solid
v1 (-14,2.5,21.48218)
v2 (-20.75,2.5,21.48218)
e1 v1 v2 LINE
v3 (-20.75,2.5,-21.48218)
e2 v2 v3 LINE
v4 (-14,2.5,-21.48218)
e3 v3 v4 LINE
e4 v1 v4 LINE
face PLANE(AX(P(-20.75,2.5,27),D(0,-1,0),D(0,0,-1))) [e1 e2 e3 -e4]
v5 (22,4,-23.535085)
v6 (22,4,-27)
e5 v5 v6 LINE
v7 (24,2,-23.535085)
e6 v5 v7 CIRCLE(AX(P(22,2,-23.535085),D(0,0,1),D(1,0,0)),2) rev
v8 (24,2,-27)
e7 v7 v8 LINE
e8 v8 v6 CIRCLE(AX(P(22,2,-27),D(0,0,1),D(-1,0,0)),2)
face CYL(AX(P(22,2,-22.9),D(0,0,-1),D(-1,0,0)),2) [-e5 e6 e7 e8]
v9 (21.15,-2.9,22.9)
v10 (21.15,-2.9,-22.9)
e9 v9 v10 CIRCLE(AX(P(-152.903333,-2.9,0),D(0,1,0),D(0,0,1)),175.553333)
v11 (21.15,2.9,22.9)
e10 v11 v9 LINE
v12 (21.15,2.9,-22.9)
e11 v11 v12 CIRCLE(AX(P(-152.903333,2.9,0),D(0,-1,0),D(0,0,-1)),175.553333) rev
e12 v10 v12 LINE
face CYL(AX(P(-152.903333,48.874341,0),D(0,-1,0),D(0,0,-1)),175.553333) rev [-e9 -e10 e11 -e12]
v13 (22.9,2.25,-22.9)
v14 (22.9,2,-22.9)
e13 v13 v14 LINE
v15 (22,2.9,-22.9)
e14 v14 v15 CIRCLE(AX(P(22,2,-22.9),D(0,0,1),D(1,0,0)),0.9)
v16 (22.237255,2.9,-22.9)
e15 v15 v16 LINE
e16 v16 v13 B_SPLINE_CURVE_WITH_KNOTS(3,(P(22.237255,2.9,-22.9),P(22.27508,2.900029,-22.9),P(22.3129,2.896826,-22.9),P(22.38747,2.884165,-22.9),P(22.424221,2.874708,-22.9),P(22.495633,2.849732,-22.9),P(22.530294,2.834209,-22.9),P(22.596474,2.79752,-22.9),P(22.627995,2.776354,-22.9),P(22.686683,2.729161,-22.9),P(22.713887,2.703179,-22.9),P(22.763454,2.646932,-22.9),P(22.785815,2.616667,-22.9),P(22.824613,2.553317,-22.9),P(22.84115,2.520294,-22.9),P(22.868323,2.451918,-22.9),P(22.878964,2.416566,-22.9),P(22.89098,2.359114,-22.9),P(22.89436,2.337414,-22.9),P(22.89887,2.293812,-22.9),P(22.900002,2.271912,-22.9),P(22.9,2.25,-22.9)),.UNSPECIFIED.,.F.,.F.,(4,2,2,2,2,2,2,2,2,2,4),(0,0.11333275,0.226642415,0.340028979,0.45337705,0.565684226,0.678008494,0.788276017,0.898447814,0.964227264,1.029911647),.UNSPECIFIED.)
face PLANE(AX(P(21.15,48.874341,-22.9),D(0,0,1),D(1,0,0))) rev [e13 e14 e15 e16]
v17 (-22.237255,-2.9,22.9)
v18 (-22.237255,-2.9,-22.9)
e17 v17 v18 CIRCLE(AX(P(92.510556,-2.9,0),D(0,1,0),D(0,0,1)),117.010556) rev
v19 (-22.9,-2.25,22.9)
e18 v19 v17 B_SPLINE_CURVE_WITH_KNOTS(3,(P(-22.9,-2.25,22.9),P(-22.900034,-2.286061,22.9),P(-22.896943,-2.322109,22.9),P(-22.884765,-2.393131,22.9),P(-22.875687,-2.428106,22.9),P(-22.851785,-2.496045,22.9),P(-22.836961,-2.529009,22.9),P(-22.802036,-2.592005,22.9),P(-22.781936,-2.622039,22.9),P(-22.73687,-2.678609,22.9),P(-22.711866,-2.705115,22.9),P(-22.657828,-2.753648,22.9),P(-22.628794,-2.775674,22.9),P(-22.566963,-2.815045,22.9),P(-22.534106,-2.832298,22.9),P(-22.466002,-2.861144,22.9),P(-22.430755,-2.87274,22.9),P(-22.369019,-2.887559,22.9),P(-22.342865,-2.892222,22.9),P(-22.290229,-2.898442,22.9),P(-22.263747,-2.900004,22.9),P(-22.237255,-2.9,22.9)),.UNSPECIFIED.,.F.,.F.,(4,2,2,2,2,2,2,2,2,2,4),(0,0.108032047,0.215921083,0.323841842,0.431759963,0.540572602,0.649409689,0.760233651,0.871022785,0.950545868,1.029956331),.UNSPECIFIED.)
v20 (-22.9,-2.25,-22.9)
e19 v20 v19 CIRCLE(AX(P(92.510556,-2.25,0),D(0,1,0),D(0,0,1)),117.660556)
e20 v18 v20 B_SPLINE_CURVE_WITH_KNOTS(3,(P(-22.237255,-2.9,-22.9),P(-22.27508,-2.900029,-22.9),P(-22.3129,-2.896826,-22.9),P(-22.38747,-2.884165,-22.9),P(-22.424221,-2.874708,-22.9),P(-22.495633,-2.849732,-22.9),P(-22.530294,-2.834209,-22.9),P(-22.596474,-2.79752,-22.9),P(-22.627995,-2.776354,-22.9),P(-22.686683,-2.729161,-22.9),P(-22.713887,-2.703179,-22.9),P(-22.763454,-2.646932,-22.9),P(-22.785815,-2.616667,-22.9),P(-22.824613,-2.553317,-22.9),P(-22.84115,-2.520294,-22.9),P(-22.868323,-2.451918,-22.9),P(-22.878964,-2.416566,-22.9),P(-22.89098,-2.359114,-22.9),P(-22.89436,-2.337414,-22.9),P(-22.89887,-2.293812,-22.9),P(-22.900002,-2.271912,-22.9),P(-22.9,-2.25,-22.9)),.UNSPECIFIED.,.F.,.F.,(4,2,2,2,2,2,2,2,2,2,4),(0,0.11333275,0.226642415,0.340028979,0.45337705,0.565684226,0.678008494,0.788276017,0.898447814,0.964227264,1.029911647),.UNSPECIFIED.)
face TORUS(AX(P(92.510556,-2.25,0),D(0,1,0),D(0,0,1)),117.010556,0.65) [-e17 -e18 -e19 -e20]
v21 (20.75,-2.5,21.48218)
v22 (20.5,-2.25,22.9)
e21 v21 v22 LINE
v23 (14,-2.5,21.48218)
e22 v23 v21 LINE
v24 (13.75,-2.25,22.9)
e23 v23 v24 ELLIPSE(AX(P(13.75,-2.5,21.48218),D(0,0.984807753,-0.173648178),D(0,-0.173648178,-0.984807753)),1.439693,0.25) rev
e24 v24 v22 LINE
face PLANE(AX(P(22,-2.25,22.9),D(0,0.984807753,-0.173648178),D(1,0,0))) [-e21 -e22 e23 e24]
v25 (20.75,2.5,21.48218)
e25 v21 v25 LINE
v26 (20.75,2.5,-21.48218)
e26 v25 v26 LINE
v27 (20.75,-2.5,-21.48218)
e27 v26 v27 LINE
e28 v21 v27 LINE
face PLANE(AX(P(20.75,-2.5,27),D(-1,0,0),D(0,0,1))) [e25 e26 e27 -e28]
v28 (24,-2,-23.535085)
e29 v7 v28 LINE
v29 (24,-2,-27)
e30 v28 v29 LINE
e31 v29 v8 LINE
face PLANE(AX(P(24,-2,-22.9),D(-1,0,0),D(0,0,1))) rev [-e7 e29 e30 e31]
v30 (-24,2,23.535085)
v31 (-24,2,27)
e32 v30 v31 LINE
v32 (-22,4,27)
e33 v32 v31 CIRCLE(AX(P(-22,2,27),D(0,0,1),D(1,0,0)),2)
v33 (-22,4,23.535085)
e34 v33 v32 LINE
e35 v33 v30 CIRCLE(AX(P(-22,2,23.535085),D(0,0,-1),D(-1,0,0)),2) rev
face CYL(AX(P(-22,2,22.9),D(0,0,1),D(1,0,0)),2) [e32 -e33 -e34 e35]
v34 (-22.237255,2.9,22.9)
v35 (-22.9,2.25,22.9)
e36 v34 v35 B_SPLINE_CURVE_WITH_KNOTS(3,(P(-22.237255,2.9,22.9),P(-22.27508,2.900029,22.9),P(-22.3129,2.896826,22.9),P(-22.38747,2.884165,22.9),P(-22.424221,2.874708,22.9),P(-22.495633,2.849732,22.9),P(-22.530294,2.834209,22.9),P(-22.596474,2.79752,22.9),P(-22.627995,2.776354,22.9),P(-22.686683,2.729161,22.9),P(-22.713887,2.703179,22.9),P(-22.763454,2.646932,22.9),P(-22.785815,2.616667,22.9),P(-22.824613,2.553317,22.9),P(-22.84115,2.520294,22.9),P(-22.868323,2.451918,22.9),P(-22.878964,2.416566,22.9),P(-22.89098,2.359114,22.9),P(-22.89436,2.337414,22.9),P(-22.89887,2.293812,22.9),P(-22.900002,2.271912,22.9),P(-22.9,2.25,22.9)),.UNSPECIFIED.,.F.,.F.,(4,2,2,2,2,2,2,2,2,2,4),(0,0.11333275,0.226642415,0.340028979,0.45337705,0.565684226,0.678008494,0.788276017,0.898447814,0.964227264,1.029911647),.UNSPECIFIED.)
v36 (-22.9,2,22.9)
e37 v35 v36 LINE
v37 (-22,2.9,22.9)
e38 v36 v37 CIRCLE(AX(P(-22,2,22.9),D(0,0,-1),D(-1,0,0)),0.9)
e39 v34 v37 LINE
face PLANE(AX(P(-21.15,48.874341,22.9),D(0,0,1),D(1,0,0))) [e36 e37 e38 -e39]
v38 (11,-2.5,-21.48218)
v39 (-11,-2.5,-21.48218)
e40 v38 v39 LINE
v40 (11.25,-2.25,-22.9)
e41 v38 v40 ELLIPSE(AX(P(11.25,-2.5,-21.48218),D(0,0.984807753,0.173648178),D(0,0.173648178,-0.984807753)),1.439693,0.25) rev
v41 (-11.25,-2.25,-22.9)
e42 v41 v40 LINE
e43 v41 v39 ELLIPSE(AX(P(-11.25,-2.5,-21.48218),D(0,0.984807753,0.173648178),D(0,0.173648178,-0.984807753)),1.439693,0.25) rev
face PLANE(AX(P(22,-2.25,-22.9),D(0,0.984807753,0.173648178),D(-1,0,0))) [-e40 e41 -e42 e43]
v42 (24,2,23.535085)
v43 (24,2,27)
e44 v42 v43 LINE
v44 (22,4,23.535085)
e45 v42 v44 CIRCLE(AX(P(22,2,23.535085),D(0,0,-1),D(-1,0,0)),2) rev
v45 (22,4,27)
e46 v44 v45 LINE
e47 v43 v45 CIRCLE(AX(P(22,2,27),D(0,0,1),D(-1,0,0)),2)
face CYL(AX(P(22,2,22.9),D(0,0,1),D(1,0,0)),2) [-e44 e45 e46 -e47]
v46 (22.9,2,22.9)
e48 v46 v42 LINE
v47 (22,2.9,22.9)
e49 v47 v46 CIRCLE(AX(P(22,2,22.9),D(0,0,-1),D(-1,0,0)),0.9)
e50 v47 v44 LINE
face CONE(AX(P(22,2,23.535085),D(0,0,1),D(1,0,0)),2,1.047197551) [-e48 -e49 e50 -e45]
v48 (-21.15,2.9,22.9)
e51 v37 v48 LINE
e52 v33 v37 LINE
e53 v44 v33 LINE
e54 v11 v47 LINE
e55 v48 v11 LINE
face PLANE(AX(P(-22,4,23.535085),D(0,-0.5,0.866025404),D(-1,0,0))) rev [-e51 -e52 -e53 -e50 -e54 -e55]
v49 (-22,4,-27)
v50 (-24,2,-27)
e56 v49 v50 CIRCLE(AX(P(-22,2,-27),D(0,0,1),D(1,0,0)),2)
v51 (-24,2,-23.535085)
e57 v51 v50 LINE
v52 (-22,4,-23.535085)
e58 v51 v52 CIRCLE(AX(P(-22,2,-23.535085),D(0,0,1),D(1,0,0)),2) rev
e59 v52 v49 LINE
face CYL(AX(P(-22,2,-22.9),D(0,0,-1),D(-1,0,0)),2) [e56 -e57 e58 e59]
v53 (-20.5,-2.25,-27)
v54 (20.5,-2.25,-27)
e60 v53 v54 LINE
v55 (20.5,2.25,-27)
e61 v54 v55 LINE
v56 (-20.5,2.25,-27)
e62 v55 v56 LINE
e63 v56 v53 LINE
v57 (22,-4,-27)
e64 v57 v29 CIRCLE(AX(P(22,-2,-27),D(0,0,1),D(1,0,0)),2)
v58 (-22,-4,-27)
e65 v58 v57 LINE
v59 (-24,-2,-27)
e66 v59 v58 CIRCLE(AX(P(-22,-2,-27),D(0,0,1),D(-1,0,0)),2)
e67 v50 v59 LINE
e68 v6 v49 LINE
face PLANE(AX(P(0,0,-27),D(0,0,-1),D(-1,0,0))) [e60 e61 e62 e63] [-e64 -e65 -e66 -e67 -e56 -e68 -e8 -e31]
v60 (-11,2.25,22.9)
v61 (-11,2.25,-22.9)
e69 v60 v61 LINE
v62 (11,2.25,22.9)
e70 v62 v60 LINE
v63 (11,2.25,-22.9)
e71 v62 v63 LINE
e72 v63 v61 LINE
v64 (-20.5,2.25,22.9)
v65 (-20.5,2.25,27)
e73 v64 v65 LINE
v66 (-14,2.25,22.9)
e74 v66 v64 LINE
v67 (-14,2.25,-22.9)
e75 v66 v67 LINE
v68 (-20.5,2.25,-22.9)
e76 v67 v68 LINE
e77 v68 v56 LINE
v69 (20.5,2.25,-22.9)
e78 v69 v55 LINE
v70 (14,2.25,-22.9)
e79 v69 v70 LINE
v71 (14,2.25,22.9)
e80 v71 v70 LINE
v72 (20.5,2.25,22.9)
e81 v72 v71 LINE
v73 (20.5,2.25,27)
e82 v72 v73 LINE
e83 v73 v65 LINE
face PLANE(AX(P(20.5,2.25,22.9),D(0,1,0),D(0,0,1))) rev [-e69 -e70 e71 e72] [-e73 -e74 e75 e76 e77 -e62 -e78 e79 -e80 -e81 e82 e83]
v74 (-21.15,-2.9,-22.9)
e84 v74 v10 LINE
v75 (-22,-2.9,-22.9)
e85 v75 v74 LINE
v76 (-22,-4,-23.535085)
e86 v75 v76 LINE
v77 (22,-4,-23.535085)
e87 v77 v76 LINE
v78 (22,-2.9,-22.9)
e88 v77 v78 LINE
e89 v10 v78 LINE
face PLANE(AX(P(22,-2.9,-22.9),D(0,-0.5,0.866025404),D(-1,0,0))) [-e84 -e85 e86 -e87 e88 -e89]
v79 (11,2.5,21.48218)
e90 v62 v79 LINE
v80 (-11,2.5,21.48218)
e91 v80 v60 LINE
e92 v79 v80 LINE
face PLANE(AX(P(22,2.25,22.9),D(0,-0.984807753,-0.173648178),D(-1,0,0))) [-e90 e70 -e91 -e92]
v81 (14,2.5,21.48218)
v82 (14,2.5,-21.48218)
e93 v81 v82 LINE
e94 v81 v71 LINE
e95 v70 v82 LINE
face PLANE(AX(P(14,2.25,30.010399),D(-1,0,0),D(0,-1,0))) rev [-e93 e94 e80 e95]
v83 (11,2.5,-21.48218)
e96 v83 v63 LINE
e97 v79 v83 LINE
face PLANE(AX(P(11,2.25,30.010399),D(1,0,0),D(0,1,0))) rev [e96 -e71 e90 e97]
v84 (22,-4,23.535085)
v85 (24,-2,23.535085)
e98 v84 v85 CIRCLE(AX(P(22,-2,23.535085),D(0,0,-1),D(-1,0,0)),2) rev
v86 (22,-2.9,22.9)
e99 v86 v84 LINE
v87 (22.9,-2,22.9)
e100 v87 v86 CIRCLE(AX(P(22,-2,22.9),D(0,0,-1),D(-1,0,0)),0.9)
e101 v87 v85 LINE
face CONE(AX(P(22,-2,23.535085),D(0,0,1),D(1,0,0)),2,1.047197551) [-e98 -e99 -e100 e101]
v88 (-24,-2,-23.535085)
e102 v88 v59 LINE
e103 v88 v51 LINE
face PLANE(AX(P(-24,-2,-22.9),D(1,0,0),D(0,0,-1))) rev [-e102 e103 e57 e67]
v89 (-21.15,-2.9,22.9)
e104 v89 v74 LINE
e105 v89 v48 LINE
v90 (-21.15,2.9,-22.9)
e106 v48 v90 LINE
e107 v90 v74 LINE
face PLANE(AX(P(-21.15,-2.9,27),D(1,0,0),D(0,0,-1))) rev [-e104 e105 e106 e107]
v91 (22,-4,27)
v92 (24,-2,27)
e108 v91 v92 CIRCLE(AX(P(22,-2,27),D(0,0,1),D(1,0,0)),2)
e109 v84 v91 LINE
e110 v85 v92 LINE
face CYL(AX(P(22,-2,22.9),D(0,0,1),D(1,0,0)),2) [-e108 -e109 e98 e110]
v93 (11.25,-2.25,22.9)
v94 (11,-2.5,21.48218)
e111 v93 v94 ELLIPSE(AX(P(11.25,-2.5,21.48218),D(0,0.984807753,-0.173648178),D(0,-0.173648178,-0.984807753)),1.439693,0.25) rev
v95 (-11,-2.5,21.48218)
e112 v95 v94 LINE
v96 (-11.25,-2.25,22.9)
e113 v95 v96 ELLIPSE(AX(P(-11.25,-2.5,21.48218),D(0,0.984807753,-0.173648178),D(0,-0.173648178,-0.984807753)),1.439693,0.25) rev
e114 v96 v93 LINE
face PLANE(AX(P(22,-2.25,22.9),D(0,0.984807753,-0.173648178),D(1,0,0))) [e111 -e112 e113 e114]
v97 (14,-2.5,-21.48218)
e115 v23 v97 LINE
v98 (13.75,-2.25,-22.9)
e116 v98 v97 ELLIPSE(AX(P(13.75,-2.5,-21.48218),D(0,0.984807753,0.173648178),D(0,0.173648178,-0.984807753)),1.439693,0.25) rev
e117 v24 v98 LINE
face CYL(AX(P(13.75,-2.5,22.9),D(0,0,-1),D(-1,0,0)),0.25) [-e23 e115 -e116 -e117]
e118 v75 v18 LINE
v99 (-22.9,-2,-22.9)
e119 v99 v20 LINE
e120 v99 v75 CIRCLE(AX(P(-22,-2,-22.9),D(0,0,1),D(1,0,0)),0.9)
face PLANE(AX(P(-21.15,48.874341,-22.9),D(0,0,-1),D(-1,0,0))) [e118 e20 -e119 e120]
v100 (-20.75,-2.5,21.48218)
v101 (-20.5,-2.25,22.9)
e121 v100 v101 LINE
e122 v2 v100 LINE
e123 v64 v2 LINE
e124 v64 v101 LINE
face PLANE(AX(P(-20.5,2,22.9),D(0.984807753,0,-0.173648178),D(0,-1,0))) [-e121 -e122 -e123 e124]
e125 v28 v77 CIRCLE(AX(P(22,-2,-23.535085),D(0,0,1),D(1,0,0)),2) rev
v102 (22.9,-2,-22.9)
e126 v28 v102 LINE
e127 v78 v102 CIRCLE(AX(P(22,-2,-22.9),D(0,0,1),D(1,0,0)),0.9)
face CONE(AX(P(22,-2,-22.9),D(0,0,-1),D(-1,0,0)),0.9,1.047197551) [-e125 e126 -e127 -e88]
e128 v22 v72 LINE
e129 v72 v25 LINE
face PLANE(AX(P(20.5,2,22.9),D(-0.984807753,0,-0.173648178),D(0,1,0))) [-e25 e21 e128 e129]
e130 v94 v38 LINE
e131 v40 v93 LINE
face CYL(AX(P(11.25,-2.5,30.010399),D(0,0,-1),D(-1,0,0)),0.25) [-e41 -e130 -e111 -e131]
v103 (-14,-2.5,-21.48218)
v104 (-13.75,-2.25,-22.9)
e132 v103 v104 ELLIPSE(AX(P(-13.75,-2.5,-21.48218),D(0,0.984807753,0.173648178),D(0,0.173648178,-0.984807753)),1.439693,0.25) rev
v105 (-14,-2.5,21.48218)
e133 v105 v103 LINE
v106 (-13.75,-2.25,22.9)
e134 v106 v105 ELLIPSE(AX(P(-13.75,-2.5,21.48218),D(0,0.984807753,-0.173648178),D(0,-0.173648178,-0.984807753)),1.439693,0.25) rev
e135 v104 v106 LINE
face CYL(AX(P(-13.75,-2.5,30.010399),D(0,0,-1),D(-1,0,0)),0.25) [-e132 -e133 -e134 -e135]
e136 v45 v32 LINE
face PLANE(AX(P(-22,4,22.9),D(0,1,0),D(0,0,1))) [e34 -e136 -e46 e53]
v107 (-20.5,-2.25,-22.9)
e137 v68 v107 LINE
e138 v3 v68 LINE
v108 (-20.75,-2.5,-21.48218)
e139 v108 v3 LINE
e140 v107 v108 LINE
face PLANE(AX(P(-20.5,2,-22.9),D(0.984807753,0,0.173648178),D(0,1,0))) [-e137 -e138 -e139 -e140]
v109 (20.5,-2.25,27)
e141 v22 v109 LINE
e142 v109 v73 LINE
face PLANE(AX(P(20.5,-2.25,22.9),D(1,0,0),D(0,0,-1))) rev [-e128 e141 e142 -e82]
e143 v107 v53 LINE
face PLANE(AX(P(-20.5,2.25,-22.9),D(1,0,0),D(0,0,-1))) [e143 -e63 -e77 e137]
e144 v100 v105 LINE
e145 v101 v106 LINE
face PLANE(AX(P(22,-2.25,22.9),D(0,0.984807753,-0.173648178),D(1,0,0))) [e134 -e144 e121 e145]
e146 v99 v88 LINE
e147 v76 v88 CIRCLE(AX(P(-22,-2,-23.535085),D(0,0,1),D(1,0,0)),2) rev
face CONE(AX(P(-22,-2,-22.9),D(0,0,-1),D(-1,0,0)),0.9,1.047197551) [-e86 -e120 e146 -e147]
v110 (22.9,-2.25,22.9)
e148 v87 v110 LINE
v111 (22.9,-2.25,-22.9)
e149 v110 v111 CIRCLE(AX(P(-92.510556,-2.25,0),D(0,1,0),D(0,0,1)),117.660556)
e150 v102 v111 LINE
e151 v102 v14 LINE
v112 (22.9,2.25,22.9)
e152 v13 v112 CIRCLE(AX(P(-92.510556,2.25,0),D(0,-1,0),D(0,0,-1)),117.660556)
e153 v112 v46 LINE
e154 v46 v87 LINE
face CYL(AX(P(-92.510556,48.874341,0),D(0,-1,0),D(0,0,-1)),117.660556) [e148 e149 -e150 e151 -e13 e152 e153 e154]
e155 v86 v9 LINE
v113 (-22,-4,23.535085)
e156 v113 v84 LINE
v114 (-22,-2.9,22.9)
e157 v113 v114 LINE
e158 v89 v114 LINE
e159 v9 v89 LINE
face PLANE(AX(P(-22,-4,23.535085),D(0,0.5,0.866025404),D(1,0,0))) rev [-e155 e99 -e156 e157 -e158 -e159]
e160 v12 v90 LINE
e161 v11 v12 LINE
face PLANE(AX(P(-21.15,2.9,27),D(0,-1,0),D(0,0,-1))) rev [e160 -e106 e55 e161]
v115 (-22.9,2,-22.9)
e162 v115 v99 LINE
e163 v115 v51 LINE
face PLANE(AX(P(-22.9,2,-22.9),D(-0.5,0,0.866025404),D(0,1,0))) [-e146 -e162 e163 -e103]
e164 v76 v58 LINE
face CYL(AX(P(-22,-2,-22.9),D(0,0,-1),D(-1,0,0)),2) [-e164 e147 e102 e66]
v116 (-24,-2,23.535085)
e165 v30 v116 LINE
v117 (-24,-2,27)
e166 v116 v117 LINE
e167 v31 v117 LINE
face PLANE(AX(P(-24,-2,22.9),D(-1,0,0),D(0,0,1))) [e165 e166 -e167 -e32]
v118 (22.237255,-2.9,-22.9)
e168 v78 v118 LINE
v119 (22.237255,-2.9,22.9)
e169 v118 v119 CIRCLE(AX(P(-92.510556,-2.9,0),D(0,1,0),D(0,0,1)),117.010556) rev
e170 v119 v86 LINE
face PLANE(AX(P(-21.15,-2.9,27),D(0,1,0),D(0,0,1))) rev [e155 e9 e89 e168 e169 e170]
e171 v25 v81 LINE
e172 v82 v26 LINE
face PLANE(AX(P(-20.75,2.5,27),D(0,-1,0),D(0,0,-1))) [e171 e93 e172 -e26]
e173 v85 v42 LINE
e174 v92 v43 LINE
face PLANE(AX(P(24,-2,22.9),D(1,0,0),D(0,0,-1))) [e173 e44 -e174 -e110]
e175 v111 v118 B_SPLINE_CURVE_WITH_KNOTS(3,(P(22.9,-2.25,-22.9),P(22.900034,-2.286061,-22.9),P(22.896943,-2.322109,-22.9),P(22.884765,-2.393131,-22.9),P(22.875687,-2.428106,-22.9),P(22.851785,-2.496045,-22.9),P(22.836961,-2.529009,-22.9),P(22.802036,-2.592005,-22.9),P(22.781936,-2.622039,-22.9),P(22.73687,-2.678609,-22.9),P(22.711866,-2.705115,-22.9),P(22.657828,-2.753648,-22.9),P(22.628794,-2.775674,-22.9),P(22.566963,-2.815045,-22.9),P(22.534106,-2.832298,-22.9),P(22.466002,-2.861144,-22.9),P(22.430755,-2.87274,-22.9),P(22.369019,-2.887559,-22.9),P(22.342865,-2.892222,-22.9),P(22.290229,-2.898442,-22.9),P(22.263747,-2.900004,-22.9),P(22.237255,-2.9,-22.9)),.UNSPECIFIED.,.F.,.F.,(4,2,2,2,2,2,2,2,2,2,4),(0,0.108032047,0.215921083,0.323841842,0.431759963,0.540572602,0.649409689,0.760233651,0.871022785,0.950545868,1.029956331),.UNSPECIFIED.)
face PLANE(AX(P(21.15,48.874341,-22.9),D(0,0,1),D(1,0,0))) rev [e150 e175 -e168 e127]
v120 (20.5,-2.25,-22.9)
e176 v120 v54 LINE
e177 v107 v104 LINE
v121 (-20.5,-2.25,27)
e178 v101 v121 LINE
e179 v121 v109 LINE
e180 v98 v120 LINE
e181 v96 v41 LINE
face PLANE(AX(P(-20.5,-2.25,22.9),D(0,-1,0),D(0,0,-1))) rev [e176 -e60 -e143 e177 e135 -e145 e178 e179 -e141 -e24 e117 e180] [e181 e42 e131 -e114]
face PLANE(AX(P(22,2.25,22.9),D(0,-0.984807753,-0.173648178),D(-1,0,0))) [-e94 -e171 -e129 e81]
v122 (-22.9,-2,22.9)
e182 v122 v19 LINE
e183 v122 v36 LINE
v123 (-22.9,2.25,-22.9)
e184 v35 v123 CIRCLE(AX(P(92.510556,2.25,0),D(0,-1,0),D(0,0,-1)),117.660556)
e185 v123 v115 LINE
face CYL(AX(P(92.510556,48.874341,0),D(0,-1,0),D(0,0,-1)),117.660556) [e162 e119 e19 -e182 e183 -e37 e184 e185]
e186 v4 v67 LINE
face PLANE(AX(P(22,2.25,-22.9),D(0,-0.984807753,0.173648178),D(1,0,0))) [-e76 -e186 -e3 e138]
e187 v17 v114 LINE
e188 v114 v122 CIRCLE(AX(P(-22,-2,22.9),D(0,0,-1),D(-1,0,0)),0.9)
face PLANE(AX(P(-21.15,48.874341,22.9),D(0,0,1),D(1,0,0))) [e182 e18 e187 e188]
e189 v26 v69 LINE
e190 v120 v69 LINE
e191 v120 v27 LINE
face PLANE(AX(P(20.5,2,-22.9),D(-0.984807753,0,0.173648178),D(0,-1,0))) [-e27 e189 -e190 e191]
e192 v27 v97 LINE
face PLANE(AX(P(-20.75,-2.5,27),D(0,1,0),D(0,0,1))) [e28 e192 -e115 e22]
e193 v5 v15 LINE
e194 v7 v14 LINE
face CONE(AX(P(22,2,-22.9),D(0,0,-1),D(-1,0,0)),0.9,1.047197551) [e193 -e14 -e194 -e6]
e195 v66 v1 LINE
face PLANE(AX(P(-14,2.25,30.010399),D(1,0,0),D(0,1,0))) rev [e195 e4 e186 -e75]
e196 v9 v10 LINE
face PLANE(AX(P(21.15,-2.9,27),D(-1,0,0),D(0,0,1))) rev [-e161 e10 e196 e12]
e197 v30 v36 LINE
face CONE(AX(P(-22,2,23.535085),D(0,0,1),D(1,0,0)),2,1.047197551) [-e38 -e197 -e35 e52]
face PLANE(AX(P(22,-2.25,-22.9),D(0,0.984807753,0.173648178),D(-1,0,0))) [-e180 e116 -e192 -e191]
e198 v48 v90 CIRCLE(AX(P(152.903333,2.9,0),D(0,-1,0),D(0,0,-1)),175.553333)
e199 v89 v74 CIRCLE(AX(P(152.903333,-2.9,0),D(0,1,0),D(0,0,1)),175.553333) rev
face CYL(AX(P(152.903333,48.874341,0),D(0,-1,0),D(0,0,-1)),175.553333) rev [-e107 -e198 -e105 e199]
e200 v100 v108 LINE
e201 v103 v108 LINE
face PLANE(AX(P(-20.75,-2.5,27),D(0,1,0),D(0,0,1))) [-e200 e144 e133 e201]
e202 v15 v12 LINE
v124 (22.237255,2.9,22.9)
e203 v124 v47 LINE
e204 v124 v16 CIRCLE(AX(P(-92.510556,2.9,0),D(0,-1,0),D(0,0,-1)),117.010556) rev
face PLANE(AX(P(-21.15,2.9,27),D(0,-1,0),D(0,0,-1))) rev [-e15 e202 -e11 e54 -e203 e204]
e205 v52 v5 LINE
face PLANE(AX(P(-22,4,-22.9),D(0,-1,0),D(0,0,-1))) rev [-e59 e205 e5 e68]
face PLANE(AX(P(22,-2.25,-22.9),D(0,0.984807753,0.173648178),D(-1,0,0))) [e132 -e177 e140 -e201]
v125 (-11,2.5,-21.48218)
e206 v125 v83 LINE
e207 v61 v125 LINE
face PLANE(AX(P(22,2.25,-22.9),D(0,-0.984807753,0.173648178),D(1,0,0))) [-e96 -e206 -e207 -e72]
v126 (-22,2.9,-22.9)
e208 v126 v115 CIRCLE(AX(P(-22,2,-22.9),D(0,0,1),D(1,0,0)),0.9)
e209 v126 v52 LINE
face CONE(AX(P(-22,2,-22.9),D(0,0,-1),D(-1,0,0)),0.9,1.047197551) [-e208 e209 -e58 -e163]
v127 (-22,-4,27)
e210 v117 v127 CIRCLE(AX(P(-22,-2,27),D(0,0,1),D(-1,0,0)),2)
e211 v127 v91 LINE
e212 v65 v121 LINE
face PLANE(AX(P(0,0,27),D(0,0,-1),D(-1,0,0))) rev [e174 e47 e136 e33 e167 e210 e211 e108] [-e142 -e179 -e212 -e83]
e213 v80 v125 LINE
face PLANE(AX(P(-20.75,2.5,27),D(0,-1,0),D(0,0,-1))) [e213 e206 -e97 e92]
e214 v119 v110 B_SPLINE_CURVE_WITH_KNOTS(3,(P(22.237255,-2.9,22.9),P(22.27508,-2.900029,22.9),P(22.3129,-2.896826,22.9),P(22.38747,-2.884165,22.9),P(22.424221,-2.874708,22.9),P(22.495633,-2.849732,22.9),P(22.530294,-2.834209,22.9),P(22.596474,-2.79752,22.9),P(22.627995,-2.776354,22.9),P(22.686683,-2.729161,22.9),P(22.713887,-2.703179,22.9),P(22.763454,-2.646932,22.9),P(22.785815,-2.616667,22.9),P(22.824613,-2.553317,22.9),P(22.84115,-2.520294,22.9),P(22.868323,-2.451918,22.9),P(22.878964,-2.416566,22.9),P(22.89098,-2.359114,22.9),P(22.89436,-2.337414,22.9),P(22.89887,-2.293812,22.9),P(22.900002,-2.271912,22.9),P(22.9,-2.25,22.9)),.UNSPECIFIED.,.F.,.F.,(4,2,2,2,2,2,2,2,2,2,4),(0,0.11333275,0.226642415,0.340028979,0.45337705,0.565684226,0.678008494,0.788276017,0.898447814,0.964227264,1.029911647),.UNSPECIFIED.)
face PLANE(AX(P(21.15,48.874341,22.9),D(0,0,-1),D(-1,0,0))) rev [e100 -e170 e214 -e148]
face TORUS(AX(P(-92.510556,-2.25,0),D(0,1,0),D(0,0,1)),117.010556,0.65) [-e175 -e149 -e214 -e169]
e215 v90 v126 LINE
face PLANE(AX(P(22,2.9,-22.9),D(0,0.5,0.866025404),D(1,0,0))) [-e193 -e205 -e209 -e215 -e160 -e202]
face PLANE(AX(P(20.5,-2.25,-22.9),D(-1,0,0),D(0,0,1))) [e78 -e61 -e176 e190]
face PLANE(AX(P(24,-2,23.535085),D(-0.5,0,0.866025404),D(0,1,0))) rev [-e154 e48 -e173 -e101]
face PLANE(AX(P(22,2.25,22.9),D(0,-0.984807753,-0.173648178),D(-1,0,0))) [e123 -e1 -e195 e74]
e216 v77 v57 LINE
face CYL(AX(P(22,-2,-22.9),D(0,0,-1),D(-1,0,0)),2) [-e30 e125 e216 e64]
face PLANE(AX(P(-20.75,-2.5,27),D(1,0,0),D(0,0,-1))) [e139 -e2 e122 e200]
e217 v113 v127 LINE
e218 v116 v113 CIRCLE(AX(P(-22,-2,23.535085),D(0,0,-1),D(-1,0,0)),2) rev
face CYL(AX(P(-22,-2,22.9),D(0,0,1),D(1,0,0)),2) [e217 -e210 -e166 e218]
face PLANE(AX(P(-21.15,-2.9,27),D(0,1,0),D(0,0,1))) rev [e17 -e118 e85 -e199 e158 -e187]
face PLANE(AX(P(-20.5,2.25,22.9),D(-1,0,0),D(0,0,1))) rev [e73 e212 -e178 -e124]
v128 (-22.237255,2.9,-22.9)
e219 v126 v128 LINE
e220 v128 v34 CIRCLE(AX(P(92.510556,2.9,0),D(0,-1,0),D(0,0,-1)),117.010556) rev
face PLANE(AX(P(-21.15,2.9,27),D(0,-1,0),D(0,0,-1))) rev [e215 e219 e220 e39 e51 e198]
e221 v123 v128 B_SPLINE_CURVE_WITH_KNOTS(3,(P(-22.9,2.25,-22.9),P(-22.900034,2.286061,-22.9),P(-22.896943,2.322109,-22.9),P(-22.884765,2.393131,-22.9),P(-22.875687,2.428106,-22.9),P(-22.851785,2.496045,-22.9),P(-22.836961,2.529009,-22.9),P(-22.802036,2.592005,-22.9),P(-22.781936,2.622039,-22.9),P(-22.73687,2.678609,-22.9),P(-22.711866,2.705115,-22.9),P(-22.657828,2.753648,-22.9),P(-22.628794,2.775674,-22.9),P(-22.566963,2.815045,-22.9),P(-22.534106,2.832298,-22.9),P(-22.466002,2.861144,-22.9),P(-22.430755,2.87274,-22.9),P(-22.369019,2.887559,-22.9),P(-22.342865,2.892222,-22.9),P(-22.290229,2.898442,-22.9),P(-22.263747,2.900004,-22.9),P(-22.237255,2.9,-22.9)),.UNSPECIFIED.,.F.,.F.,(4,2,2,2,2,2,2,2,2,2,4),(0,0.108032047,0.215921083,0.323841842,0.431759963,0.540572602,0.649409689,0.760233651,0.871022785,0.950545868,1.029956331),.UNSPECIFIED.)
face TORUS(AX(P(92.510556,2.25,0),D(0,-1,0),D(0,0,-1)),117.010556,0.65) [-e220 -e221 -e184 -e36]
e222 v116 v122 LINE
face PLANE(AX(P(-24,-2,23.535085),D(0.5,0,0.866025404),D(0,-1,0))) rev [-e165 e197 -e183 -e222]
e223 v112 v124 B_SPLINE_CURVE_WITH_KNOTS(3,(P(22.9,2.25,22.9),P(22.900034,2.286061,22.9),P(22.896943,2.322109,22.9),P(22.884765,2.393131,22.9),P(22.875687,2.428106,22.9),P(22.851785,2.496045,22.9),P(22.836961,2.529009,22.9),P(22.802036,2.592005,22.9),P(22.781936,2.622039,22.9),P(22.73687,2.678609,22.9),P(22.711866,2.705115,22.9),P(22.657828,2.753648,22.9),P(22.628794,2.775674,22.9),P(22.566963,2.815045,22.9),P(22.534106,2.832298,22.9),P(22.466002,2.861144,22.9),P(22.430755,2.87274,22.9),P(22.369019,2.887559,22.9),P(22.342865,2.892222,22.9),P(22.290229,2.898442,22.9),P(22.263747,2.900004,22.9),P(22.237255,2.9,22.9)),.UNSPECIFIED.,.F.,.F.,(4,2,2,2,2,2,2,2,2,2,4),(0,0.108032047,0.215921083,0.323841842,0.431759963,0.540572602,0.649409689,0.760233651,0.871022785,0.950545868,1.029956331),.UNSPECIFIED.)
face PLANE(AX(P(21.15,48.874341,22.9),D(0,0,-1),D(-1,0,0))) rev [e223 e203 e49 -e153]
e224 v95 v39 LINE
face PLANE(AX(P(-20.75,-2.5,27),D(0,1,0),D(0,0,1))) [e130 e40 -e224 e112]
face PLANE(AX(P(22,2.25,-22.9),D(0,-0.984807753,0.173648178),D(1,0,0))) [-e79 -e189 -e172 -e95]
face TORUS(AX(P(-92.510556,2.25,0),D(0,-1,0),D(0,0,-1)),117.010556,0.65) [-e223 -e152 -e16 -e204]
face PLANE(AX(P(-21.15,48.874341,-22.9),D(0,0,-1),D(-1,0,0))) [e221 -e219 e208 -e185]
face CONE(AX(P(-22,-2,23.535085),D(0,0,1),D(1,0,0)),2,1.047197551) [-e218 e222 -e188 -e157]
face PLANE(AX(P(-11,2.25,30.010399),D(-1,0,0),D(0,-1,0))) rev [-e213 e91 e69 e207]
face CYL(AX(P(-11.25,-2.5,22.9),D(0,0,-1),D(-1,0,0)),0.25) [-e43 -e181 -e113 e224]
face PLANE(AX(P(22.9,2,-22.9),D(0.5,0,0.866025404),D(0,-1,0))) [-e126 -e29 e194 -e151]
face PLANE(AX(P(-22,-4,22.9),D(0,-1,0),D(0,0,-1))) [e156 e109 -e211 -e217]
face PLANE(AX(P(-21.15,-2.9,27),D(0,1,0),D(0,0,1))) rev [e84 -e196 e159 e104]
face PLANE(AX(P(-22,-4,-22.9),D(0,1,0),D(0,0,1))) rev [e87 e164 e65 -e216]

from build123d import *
from OCP.BRepFilletAPI import BRepFilletAPI_MakeChamfer

# Parameters (mm, degrees)
SKETCH1_W                                  = 42.3
SKETCH1_H                                  = 5.8
SKETCH1_W_2                                = 41.5
SKETCH1_H_2                                = 5
CORE_POCKET_DEPTH                          = 27
SKETCH2_W                                  = 41
SKETCH2_H                                  = 4.5
BOSS_EXTRUDE2_DEPTH                        = 4.1
CHAMFER2_SIZE                              = 1.1
CHAMFER2_SIZE_2                            = 0.635085296
CHAMFER3_SIZE                              = 1.417820455
CHAMFER3_SIZE_2                            = 0.25
SIDE_SUPPORT_DEPTH                         = 2.9
SIDE_SUPPORT_FILLET_R                      = 0.65
SIDE_SUPPORT_FILLET_OF_SIDE_SUPPORT_MIRR_R = 0.65
BOSS_EXTRUDE3_START                        = 4.1
SKETCH5_W                                  = 3
SKETCH5_H                                  = 0.25
BOSS_EXTRUDE3_DEPTH                        = 45.8
FILLET1_R                                  = 0.25


# Read off the part's stored shape, not the designer's step: Mirror1
# Some blends are built 0.0001 mm under size
with BuildPart() as part:
    # Sketch1 → Core-Pocket (new, symmetric)
    with BuildSketch(Plane.XY):
        Rectangle(SKETCH1_W, SKETCH1_H)
        Rectangle(SKETCH1_W_2, SKETCH1_H_2, mode=Mode.SUBTRACT)
    extrude(amount=CORE_POCKET_DEPTH, both=True)

    # Sketch2 → Boss-Extrude2 (add)
    with BuildSketch(Plane.XY.offset(27)):
        with BuildLine():
            Line((-22, -4), (22, -4))
            ThreePointArc((22, -4), (23.414213562, -3.414213562), (24, -2))
            Line((24, -2), (24, 2))
            ThreePointArc((24, 2), (23.414213562, 3.414213562), (22, 4))
            Line((22, 4), (-22, 4))
            ThreePointArc((-22, 4), (-23.414213562, 3.414213562), (-24, 2))
            Line((-24, 2), (-24, -2))
            ThreePointArc((-24, -2), (-23.414213562, -3.414213562), (-22, -4))
        make_face()
        Rectangle(SKETCH2_W, SKETCH2_H, mode=Mode.SUBTRACT)
    extrude(amount=-BOSS_EXTRUDE2_DEPTH)

    # Chamfer2
    chamfer2_edges_1 = [part.edges().sort_by_distance(p)[0] for p in [
        (23.414213562, 3.414213562, 22.9),
    ]]
    chamfer2_side_1 = [part.faces().sort_by_distance(p)[0] for p in [
        (23.4052321, 3.4052321, 22.9),
    ]]
    chamfer2_edges_2 = [part.edges().sort_by_distance(p)[0] for p in [
        (24, 0, 22.9),
    ]]
    chamfer2_side_2 = [part.faces().sort_by_distance(p)[0] for p in [
        (23.987298294, 0, 22.9),
    ]]
    chamfer2_edges_3 = [part.edges().sort_by_distance(p)[0] for p in [
        (23.414213562, -3.414213562, 22.9),
    ]]
    chamfer2_side_3 = [part.faces().sort_by_distance(p)[0] for p in [
        (23.4052321, -3.4052321, 22.9),
    ]]
    chamfer2_edges_4 = [part.edges().sort_by_distance(p)[0] for p in [
        (0, -4, 22.9),
    ]]
    chamfer2_side_4 = [part.faces().sort_by_distance(p)[0] for p in [
        (0, -3.987298294, 22.9),
    ]]
    chamfer2_edges_5 = [part.edges().sort_by_distance(p)[0] for p in [
        (-23.414213562, -3.414213562, 22.9),
    ]]
    chamfer2_side_5 = [part.faces().sort_by_distance(p)[0] for p in [
        (-23.4052321, -3.4052321, 22.9),
    ]]
    chamfer2_edges_6 = [part.edges().sort_by_distance(p)[0] for p in [
        (-24, 0, 22.9),
    ]]
    chamfer2_side_6 = [part.faces().sort_by_distance(p)[0] for p in [
        (-23.987298294, 0, 22.9),
    ]]
    chamfer2_edges_7 = [part.edges().sort_by_distance(p)[0] for p in [
        (-23.414213562, 3.414213562, 22.9),
    ]]
    chamfer2_side_7 = [part.faces().sort_by_distance(p)[0] for p in [
        (-23.4052321, 3.4052321, 22.9),
    ]]
    chamfer2_edges_8 = [part.edges().sort_by_distance(p)[0] for p in [
        (0, 4, 22.9),
    ]]
    chamfer2_side_8 = [part.faces().sort_by_distance(p)[0] for p in [
        (0, 3.987298294, 22.9),
    ]]
    chamfer2 = BRepFilletAPI_MakeChamfer(part.part.solid().wrapped)
    for e in chamfer2_edges_1:
        chamfer2.Add(CHAMFER2_SIZE - 0.0001, CHAMFER2_SIZE_2 - 0.0001, e.wrapped, chamfer2_side_1[0].wrapped)
    for e in chamfer2_edges_2:
        chamfer2.Add(CHAMFER2_SIZE - 0.0001, CHAMFER2_SIZE_2 - 0.0001, e.wrapped, chamfer2_side_2[0].wrapped)
    for e in chamfer2_edges_3:
        chamfer2.Add(CHAMFER2_SIZE - 0.0001, CHAMFER2_SIZE_2 - 0.0001, e.wrapped, chamfer2_side_3[0].wrapped)
    for e in chamfer2_edges_4:
        chamfer2.Add(CHAMFER2_SIZE - 0.0001, CHAMFER2_SIZE_2 - 0.0001, e.wrapped, chamfer2_side_4[0].wrapped)
    for e in chamfer2_edges_5:
        chamfer2.Add(CHAMFER2_SIZE - 0.0001, CHAMFER2_SIZE_2 - 0.0001, e.wrapped, chamfer2_side_5[0].wrapped)
    for e in chamfer2_edges_6:
        chamfer2.Add(CHAMFER2_SIZE - 0.0001, CHAMFER2_SIZE_2 - 0.0001, e.wrapped, chamfer2_side_6[0].wrapped)
    for e in chamfer2_edges_7:
        chamfer2.Add(CHAMFER2_SIZE - 0.0001, CHAMFER2_SIZE_2 - 0.0001, e.wrapped, chamfer2_side_7[0].wrapped)
    for e in chamfer2_edges_8:
        chamfer2.Add(CHAMFER2_SIZE - 0.0001, CHAMFER2_SIZE_2 - 0.0001, e.wrapped, chamfer2_side_8[0].wrapped)
    add(Compound.cast(chamfer2.Shape()), mode=Mode.REPLACE)  # a hair under: the kernel refuses the full size

    # Chamfer3
    # the kernel refuses this chamfer: 1.417820455, 0.25 mm, written as the material it adds along each edge
    with BuildSketch(Plane(origin=(-20.75, 2.5, 22.9), x_dir=(0, 0.006682531656101647, -0.9999776716360547), z_dir=(1, 0, 0)), Plane(origin=(20.75, -2.5, 22.9), x_dir=(0, -0.006682531656101647, -0.9999776716360547), z_dir=(-1, 0, 0))) as chamfer3_piece_1:
        Polygon((CHAMFER3_SIZE * 0.999977671569, -CHAMFER3_SIZE * 0.00668253165565), (-CHAMFER3_SIZE_2 * 0.0066825316561, -CHAMFER3_SIZE_2 * 0.999977671636), (0, 0), align=None)
    extrude(amount=41.5)
    with BuildSketch(Plane(origin=(-20.75, -2.5, 22.9), x_dir=(-0.006682531656101949, 0, -0.9999776716360547), z_dir=(0, 1, 0)), Plane(origin=(20.75, 2.5, 22.9), x_dir=(0.006682531656101949, 0, -0.9999776716360547), z_dir=(0, -1, 0))) as chamfer3_piece_2:
        Polygon((CHAMFER3_SIZE * 0.999977671569, -CHAMFER3_SIZE * 0.00668253165565), (-CHAMFER3_SIZE_2 * 0.0066825316561, -CHAMFER3_SIZE_2 * 0.999977671636), (0, 0), align=None)
    extrude(amount=5)

    # Mirror1: part across plane


with BuildPart() as part_1:
    add(part.part)
    add(part.part.mirror(Plane.XY))

    # Sketch4 → Side support (add, symmetric)
    with BuildSketch(Plane(origin=(0, 0, 0), x_dir=(1, 0, 0), z_dir=(0, 1, 0))):
        with BuildLine():
            Line((21.15, -22.9), (22.9, -22.9))
            ThreePointArc((22.9, -22.9), (25.15, 0), (22.9, 22.9))
            Line((22.9, 22.9), (21.15, 22.9))
            ThreePointArc((21.15, 22.9), (22.65, 0), (21.15, -22.9))
        make_face()
    side_support = extrude(amount=SIDE_SUPPORT_DEPTH, both=True)

    # side support fillet
    side_support_fillet_edges = [part_1.edges().sort_by_distance(p)[0] for p in [
        (25.15, 2.9, 0),
        (25.15, -2.9, 0),
    ]]
    fillet(side_support_fillet_edges, radius=SIDE_SUPPORT_FILLET_R)

    # Side support mirror: Side support across plane
    add(side_support.mirror(Plane(origin=(0, 0, 0), x_dir=(0, 0, 1), z_dir=(1, 0, 0))))

    # side support fillet of Side support mirr
    side_support_fillet_of_side_support_mirr_edges = [part_1.edges().sort_by_distance(p)[0] for p in [
        (-25.15, 2.9, 0),
        (-25.15, -2.9, 0),
    ]]
    fillet(side_support_fillet_of_side_support_mirr_edges, radius=SIDE_SUPPORT_FILLET_OF_SIDE_SUPPORT_MIRR_R)

    # Sketch5 → Boss-Extrude3 (add)
    with BuildSketch(Plane.XY.offset(-27).offset(BOSS_EXTRUDE3_START)):
        with Locations((-12.5, -2.375)):
            Rectangle(SKETCH5_W, SKETCH5_H)
        with Locations((12.5, -2.375)):
            Rectangle(SKETCH5_W, SKETCH5_H)
        with Locations((12.5, 2.375)):
            Rectangle(SKETCH5_W, SKETCH5_H)
        with Locations((-12.5, 2.375)):
            Rectangle(SKETCH5_W, SKETCH5_H)
    extrude(amount=BOSS_EXTRUDE3_DEPTH)

    # Fillet1
    fillet1_edges = [part_1.edges().sort_by_distance(p)[0] for p in [
        (14, -2.25, 0),
        (11, -2.25, 0),
        (-14, -2.25, 0),
        (-11, -2.25, 0),
    ]]
    fillet(fillet1_edges, radius=FILLET1_R - 0.0001)  # a hair under: the kernel refuses the full size


solid = part_1.part
